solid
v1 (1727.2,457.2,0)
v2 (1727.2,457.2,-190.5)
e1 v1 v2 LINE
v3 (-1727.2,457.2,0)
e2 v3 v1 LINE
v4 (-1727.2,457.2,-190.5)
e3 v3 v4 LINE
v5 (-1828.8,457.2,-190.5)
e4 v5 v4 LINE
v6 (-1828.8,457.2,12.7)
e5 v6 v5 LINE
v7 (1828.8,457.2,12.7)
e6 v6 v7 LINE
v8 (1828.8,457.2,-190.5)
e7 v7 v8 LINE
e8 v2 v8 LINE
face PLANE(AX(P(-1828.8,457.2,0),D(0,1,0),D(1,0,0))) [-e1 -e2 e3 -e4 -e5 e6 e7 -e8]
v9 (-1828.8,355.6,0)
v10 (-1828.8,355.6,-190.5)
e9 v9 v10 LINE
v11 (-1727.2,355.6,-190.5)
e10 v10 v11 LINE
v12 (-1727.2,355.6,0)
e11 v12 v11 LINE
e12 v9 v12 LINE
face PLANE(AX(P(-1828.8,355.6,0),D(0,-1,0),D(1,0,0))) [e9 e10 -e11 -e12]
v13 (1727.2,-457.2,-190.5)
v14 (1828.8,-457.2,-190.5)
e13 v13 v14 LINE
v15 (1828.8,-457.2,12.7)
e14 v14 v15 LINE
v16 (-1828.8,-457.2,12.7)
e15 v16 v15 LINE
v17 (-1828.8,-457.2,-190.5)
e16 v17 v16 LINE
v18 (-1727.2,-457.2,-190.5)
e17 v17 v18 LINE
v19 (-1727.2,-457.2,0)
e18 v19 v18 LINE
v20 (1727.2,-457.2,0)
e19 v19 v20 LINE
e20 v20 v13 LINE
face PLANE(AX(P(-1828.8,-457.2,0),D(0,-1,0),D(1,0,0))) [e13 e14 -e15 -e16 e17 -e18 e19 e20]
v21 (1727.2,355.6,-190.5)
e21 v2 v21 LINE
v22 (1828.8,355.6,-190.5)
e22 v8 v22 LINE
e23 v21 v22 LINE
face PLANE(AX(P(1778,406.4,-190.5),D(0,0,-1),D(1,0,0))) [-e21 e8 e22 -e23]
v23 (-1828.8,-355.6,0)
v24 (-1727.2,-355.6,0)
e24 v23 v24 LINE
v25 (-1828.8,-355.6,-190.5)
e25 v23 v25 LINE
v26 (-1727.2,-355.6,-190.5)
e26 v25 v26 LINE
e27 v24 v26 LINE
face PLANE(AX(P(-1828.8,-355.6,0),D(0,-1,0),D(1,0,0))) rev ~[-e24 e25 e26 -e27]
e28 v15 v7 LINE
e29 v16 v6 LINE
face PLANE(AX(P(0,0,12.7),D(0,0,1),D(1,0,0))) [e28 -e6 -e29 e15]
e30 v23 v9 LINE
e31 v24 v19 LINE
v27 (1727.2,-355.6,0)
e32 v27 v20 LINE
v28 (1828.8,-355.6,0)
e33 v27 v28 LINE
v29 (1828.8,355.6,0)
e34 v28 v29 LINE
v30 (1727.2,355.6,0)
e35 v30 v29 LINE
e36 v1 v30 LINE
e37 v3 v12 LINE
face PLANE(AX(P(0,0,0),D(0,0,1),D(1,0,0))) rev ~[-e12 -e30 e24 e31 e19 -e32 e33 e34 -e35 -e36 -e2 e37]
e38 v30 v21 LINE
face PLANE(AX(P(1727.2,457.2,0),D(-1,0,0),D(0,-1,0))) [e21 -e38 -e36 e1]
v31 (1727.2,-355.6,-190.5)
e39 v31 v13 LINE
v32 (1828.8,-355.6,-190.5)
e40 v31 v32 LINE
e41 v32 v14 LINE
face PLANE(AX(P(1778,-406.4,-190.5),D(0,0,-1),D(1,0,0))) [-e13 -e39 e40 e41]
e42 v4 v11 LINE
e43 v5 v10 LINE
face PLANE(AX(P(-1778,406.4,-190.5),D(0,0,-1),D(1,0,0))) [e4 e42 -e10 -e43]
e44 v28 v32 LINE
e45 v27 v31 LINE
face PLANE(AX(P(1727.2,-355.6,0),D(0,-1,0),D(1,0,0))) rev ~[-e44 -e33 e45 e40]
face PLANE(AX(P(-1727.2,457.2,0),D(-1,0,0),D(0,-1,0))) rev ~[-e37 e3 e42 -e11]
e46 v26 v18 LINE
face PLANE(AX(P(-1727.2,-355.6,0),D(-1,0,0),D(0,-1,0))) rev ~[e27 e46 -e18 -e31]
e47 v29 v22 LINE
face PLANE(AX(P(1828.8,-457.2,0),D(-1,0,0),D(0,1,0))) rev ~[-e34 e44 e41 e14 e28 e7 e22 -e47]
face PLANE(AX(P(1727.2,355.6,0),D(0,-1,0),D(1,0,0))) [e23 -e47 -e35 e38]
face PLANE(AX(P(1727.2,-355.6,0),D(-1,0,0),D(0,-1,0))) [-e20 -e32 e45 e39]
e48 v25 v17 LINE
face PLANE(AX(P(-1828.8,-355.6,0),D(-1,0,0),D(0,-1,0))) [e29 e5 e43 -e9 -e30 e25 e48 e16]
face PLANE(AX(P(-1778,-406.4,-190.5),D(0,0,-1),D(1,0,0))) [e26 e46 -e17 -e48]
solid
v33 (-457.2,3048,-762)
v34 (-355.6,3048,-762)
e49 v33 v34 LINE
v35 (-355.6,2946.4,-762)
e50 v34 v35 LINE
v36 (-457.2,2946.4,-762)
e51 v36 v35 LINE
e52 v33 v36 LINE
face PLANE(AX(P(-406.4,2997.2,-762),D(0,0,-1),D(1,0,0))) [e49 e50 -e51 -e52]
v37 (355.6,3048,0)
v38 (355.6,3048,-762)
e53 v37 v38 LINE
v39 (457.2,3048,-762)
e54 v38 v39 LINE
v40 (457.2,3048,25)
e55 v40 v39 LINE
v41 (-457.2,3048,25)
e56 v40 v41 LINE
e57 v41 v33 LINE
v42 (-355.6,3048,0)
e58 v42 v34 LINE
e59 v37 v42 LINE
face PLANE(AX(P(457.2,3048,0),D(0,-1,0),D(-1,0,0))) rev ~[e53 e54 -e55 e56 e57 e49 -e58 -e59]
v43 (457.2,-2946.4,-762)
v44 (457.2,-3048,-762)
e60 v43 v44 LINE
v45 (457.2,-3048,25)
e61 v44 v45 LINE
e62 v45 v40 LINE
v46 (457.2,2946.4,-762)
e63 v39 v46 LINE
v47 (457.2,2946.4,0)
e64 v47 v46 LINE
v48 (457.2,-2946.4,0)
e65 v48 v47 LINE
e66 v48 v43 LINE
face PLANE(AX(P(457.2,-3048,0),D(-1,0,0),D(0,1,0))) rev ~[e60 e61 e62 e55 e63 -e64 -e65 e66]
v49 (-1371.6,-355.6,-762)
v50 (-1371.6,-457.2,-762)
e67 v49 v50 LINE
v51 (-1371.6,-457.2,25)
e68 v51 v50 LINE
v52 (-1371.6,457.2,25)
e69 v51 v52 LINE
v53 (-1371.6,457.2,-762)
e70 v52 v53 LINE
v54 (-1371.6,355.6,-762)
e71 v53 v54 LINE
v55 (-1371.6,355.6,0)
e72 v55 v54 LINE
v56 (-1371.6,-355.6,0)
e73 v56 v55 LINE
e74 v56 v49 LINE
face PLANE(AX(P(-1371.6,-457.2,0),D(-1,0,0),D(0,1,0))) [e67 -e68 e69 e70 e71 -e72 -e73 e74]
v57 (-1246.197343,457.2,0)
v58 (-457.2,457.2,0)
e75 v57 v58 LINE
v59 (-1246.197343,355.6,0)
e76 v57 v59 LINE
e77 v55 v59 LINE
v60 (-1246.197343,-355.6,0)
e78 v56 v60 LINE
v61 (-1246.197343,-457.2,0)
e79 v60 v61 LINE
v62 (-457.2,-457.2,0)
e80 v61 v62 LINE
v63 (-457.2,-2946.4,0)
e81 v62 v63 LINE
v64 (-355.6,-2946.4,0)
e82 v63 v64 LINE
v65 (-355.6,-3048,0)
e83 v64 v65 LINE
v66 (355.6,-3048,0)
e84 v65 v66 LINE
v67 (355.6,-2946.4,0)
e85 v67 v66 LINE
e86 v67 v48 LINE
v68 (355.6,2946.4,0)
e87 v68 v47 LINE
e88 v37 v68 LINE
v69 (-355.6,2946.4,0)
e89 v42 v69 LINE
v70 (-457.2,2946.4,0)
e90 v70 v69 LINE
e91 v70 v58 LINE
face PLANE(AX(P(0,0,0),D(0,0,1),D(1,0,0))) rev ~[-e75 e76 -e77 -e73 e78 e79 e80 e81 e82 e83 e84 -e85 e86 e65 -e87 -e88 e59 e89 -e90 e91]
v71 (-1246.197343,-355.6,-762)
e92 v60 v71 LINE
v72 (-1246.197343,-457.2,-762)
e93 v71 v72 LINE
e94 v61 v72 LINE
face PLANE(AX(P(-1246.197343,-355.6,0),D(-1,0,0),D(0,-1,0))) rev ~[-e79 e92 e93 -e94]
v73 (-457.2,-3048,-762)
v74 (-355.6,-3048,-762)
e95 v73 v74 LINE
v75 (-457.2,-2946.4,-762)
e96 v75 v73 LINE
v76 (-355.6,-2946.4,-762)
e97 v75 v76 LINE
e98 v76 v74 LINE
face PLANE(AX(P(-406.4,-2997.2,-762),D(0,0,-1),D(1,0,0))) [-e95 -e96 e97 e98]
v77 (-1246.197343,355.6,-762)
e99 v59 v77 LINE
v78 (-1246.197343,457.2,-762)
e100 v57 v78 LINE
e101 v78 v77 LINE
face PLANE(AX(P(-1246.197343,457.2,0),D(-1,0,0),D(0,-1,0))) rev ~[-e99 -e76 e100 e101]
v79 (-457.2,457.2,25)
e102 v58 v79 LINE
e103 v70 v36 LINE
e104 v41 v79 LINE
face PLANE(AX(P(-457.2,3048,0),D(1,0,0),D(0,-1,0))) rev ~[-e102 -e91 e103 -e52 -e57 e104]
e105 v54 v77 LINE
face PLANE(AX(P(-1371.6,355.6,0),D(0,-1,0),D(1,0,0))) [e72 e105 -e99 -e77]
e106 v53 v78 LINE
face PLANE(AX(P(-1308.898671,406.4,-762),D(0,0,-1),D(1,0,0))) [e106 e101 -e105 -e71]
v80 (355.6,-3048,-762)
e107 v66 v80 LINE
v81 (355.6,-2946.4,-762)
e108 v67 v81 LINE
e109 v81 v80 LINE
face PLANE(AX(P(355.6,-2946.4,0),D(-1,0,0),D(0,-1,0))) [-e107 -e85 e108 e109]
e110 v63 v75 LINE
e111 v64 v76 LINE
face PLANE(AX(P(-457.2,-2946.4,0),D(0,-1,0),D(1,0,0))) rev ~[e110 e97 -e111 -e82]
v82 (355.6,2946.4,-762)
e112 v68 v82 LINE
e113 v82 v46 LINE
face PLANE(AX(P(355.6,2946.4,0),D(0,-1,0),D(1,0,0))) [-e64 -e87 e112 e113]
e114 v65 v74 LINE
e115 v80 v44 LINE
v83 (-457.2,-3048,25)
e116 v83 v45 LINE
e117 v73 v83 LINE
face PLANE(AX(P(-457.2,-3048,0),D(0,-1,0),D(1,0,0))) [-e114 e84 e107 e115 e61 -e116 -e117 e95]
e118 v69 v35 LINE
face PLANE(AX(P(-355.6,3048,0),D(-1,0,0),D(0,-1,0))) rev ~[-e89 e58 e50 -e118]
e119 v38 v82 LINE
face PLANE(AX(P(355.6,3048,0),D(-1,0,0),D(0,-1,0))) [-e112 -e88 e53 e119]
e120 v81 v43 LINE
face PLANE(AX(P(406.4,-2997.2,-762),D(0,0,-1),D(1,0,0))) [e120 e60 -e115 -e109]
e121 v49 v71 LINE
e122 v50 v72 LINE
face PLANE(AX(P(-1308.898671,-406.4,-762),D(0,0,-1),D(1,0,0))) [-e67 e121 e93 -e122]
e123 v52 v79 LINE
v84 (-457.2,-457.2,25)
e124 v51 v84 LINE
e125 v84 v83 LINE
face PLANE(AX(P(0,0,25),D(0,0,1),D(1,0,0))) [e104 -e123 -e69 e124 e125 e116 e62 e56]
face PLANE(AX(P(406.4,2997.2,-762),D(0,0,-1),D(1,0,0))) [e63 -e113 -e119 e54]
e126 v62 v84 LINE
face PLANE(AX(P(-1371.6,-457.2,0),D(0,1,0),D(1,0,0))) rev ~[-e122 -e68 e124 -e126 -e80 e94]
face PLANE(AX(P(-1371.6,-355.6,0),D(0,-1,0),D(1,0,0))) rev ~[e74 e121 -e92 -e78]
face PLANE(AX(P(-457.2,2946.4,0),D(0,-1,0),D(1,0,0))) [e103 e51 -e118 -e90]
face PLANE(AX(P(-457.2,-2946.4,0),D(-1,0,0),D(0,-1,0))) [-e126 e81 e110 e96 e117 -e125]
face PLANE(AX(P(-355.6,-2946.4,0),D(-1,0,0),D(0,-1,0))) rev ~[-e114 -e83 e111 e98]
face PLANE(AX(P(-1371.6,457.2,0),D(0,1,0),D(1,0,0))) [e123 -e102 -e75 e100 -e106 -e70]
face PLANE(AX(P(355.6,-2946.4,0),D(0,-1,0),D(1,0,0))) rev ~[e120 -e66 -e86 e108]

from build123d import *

# Parameters (mm, degrees)
F0_W     = 3657.6
F0_H     = 914.4
F1_DEPTH = 12.7
F2_W     = 101.6
F2_H     = 101.6
F3_DEPTH = 190.5
F4_W     = 914.4
F4_H     = 914.4
F5_DEPTH = 25
F6_W     = 101.6
F6_H     = 101.6
F6_W_2   = 125.4026571274
F7_DEPTH = 762


with BuildPart() as f1:
    # F0 (on Top) → F1 (new body)
    with BuildSketch(Plane.XY):
        Rectangle(F0_W, F0_H)
    extrude(amount=F1_DEPTH)

    # F2 (on face) → F3 (join)
    with BuildSketch(Plane(origin=(0, 0, 0), x_dir=(1, 0, 0), z_dir=(0, 0, -1))):
        with Locations((-1778, 406.4)):
            Rectangle(F2_W, F2_H)
        with Locations((1778, 406.4)):
            Rectangle(F2_W, F2_H)
        with Locations((-1778, -406.4)):
            Rectangle(F2_W, F2_H)
        with Locations((1778, -406.4)):
            Rectangle(F2_W, F2_H)
    extrude(amount=F3_DEPTH)


with BuildPart() as f5:
    # F4 (on Top) → F5 (new body)
    with BuildSketch(Plane.XY):
        Polygon((-457.2, -3048), (457.2, -3048), (457.2, 3048), (-457.2, 3048), (-457.2, 457.2), (-457.2, -457.2), align=None)
        with Locations((-914.4, 0)):
            Rectangle(F4_W, F4_H)
    extrude(amount=F5_DEPTH)

    # F6 (on face) → F7 (join)
    with BuildSketch(Plane(origin=(0, 0, 0), x_dir=(1, 0, 0), z_dir=(0, 0, -1))):
        with Locations((-406.4, 2997.2)):
            Rectangle(F6_W, F6_H)
        with Locations((406.4, 2997.2)):
            Rectangle(F6_W, F6_H)
        with Locations((-406.4, -2997.2)):
            Rectangle(F6_W, F6_H)
        with Locations((406.4, -2997.2)):
            Rectangle(F6_W, F6_H)
        with Locations((-1308.8986714363, 406.4)):
            Rectangle(F6_W_2, F6_H)
        with Locations((-1308.8986714363, -406.4)):
            Rectangle(F6_W_2, F6_H)
    extrude(amount=F7_DEPTH)


solid = Compound([f1.part, f5.part])
